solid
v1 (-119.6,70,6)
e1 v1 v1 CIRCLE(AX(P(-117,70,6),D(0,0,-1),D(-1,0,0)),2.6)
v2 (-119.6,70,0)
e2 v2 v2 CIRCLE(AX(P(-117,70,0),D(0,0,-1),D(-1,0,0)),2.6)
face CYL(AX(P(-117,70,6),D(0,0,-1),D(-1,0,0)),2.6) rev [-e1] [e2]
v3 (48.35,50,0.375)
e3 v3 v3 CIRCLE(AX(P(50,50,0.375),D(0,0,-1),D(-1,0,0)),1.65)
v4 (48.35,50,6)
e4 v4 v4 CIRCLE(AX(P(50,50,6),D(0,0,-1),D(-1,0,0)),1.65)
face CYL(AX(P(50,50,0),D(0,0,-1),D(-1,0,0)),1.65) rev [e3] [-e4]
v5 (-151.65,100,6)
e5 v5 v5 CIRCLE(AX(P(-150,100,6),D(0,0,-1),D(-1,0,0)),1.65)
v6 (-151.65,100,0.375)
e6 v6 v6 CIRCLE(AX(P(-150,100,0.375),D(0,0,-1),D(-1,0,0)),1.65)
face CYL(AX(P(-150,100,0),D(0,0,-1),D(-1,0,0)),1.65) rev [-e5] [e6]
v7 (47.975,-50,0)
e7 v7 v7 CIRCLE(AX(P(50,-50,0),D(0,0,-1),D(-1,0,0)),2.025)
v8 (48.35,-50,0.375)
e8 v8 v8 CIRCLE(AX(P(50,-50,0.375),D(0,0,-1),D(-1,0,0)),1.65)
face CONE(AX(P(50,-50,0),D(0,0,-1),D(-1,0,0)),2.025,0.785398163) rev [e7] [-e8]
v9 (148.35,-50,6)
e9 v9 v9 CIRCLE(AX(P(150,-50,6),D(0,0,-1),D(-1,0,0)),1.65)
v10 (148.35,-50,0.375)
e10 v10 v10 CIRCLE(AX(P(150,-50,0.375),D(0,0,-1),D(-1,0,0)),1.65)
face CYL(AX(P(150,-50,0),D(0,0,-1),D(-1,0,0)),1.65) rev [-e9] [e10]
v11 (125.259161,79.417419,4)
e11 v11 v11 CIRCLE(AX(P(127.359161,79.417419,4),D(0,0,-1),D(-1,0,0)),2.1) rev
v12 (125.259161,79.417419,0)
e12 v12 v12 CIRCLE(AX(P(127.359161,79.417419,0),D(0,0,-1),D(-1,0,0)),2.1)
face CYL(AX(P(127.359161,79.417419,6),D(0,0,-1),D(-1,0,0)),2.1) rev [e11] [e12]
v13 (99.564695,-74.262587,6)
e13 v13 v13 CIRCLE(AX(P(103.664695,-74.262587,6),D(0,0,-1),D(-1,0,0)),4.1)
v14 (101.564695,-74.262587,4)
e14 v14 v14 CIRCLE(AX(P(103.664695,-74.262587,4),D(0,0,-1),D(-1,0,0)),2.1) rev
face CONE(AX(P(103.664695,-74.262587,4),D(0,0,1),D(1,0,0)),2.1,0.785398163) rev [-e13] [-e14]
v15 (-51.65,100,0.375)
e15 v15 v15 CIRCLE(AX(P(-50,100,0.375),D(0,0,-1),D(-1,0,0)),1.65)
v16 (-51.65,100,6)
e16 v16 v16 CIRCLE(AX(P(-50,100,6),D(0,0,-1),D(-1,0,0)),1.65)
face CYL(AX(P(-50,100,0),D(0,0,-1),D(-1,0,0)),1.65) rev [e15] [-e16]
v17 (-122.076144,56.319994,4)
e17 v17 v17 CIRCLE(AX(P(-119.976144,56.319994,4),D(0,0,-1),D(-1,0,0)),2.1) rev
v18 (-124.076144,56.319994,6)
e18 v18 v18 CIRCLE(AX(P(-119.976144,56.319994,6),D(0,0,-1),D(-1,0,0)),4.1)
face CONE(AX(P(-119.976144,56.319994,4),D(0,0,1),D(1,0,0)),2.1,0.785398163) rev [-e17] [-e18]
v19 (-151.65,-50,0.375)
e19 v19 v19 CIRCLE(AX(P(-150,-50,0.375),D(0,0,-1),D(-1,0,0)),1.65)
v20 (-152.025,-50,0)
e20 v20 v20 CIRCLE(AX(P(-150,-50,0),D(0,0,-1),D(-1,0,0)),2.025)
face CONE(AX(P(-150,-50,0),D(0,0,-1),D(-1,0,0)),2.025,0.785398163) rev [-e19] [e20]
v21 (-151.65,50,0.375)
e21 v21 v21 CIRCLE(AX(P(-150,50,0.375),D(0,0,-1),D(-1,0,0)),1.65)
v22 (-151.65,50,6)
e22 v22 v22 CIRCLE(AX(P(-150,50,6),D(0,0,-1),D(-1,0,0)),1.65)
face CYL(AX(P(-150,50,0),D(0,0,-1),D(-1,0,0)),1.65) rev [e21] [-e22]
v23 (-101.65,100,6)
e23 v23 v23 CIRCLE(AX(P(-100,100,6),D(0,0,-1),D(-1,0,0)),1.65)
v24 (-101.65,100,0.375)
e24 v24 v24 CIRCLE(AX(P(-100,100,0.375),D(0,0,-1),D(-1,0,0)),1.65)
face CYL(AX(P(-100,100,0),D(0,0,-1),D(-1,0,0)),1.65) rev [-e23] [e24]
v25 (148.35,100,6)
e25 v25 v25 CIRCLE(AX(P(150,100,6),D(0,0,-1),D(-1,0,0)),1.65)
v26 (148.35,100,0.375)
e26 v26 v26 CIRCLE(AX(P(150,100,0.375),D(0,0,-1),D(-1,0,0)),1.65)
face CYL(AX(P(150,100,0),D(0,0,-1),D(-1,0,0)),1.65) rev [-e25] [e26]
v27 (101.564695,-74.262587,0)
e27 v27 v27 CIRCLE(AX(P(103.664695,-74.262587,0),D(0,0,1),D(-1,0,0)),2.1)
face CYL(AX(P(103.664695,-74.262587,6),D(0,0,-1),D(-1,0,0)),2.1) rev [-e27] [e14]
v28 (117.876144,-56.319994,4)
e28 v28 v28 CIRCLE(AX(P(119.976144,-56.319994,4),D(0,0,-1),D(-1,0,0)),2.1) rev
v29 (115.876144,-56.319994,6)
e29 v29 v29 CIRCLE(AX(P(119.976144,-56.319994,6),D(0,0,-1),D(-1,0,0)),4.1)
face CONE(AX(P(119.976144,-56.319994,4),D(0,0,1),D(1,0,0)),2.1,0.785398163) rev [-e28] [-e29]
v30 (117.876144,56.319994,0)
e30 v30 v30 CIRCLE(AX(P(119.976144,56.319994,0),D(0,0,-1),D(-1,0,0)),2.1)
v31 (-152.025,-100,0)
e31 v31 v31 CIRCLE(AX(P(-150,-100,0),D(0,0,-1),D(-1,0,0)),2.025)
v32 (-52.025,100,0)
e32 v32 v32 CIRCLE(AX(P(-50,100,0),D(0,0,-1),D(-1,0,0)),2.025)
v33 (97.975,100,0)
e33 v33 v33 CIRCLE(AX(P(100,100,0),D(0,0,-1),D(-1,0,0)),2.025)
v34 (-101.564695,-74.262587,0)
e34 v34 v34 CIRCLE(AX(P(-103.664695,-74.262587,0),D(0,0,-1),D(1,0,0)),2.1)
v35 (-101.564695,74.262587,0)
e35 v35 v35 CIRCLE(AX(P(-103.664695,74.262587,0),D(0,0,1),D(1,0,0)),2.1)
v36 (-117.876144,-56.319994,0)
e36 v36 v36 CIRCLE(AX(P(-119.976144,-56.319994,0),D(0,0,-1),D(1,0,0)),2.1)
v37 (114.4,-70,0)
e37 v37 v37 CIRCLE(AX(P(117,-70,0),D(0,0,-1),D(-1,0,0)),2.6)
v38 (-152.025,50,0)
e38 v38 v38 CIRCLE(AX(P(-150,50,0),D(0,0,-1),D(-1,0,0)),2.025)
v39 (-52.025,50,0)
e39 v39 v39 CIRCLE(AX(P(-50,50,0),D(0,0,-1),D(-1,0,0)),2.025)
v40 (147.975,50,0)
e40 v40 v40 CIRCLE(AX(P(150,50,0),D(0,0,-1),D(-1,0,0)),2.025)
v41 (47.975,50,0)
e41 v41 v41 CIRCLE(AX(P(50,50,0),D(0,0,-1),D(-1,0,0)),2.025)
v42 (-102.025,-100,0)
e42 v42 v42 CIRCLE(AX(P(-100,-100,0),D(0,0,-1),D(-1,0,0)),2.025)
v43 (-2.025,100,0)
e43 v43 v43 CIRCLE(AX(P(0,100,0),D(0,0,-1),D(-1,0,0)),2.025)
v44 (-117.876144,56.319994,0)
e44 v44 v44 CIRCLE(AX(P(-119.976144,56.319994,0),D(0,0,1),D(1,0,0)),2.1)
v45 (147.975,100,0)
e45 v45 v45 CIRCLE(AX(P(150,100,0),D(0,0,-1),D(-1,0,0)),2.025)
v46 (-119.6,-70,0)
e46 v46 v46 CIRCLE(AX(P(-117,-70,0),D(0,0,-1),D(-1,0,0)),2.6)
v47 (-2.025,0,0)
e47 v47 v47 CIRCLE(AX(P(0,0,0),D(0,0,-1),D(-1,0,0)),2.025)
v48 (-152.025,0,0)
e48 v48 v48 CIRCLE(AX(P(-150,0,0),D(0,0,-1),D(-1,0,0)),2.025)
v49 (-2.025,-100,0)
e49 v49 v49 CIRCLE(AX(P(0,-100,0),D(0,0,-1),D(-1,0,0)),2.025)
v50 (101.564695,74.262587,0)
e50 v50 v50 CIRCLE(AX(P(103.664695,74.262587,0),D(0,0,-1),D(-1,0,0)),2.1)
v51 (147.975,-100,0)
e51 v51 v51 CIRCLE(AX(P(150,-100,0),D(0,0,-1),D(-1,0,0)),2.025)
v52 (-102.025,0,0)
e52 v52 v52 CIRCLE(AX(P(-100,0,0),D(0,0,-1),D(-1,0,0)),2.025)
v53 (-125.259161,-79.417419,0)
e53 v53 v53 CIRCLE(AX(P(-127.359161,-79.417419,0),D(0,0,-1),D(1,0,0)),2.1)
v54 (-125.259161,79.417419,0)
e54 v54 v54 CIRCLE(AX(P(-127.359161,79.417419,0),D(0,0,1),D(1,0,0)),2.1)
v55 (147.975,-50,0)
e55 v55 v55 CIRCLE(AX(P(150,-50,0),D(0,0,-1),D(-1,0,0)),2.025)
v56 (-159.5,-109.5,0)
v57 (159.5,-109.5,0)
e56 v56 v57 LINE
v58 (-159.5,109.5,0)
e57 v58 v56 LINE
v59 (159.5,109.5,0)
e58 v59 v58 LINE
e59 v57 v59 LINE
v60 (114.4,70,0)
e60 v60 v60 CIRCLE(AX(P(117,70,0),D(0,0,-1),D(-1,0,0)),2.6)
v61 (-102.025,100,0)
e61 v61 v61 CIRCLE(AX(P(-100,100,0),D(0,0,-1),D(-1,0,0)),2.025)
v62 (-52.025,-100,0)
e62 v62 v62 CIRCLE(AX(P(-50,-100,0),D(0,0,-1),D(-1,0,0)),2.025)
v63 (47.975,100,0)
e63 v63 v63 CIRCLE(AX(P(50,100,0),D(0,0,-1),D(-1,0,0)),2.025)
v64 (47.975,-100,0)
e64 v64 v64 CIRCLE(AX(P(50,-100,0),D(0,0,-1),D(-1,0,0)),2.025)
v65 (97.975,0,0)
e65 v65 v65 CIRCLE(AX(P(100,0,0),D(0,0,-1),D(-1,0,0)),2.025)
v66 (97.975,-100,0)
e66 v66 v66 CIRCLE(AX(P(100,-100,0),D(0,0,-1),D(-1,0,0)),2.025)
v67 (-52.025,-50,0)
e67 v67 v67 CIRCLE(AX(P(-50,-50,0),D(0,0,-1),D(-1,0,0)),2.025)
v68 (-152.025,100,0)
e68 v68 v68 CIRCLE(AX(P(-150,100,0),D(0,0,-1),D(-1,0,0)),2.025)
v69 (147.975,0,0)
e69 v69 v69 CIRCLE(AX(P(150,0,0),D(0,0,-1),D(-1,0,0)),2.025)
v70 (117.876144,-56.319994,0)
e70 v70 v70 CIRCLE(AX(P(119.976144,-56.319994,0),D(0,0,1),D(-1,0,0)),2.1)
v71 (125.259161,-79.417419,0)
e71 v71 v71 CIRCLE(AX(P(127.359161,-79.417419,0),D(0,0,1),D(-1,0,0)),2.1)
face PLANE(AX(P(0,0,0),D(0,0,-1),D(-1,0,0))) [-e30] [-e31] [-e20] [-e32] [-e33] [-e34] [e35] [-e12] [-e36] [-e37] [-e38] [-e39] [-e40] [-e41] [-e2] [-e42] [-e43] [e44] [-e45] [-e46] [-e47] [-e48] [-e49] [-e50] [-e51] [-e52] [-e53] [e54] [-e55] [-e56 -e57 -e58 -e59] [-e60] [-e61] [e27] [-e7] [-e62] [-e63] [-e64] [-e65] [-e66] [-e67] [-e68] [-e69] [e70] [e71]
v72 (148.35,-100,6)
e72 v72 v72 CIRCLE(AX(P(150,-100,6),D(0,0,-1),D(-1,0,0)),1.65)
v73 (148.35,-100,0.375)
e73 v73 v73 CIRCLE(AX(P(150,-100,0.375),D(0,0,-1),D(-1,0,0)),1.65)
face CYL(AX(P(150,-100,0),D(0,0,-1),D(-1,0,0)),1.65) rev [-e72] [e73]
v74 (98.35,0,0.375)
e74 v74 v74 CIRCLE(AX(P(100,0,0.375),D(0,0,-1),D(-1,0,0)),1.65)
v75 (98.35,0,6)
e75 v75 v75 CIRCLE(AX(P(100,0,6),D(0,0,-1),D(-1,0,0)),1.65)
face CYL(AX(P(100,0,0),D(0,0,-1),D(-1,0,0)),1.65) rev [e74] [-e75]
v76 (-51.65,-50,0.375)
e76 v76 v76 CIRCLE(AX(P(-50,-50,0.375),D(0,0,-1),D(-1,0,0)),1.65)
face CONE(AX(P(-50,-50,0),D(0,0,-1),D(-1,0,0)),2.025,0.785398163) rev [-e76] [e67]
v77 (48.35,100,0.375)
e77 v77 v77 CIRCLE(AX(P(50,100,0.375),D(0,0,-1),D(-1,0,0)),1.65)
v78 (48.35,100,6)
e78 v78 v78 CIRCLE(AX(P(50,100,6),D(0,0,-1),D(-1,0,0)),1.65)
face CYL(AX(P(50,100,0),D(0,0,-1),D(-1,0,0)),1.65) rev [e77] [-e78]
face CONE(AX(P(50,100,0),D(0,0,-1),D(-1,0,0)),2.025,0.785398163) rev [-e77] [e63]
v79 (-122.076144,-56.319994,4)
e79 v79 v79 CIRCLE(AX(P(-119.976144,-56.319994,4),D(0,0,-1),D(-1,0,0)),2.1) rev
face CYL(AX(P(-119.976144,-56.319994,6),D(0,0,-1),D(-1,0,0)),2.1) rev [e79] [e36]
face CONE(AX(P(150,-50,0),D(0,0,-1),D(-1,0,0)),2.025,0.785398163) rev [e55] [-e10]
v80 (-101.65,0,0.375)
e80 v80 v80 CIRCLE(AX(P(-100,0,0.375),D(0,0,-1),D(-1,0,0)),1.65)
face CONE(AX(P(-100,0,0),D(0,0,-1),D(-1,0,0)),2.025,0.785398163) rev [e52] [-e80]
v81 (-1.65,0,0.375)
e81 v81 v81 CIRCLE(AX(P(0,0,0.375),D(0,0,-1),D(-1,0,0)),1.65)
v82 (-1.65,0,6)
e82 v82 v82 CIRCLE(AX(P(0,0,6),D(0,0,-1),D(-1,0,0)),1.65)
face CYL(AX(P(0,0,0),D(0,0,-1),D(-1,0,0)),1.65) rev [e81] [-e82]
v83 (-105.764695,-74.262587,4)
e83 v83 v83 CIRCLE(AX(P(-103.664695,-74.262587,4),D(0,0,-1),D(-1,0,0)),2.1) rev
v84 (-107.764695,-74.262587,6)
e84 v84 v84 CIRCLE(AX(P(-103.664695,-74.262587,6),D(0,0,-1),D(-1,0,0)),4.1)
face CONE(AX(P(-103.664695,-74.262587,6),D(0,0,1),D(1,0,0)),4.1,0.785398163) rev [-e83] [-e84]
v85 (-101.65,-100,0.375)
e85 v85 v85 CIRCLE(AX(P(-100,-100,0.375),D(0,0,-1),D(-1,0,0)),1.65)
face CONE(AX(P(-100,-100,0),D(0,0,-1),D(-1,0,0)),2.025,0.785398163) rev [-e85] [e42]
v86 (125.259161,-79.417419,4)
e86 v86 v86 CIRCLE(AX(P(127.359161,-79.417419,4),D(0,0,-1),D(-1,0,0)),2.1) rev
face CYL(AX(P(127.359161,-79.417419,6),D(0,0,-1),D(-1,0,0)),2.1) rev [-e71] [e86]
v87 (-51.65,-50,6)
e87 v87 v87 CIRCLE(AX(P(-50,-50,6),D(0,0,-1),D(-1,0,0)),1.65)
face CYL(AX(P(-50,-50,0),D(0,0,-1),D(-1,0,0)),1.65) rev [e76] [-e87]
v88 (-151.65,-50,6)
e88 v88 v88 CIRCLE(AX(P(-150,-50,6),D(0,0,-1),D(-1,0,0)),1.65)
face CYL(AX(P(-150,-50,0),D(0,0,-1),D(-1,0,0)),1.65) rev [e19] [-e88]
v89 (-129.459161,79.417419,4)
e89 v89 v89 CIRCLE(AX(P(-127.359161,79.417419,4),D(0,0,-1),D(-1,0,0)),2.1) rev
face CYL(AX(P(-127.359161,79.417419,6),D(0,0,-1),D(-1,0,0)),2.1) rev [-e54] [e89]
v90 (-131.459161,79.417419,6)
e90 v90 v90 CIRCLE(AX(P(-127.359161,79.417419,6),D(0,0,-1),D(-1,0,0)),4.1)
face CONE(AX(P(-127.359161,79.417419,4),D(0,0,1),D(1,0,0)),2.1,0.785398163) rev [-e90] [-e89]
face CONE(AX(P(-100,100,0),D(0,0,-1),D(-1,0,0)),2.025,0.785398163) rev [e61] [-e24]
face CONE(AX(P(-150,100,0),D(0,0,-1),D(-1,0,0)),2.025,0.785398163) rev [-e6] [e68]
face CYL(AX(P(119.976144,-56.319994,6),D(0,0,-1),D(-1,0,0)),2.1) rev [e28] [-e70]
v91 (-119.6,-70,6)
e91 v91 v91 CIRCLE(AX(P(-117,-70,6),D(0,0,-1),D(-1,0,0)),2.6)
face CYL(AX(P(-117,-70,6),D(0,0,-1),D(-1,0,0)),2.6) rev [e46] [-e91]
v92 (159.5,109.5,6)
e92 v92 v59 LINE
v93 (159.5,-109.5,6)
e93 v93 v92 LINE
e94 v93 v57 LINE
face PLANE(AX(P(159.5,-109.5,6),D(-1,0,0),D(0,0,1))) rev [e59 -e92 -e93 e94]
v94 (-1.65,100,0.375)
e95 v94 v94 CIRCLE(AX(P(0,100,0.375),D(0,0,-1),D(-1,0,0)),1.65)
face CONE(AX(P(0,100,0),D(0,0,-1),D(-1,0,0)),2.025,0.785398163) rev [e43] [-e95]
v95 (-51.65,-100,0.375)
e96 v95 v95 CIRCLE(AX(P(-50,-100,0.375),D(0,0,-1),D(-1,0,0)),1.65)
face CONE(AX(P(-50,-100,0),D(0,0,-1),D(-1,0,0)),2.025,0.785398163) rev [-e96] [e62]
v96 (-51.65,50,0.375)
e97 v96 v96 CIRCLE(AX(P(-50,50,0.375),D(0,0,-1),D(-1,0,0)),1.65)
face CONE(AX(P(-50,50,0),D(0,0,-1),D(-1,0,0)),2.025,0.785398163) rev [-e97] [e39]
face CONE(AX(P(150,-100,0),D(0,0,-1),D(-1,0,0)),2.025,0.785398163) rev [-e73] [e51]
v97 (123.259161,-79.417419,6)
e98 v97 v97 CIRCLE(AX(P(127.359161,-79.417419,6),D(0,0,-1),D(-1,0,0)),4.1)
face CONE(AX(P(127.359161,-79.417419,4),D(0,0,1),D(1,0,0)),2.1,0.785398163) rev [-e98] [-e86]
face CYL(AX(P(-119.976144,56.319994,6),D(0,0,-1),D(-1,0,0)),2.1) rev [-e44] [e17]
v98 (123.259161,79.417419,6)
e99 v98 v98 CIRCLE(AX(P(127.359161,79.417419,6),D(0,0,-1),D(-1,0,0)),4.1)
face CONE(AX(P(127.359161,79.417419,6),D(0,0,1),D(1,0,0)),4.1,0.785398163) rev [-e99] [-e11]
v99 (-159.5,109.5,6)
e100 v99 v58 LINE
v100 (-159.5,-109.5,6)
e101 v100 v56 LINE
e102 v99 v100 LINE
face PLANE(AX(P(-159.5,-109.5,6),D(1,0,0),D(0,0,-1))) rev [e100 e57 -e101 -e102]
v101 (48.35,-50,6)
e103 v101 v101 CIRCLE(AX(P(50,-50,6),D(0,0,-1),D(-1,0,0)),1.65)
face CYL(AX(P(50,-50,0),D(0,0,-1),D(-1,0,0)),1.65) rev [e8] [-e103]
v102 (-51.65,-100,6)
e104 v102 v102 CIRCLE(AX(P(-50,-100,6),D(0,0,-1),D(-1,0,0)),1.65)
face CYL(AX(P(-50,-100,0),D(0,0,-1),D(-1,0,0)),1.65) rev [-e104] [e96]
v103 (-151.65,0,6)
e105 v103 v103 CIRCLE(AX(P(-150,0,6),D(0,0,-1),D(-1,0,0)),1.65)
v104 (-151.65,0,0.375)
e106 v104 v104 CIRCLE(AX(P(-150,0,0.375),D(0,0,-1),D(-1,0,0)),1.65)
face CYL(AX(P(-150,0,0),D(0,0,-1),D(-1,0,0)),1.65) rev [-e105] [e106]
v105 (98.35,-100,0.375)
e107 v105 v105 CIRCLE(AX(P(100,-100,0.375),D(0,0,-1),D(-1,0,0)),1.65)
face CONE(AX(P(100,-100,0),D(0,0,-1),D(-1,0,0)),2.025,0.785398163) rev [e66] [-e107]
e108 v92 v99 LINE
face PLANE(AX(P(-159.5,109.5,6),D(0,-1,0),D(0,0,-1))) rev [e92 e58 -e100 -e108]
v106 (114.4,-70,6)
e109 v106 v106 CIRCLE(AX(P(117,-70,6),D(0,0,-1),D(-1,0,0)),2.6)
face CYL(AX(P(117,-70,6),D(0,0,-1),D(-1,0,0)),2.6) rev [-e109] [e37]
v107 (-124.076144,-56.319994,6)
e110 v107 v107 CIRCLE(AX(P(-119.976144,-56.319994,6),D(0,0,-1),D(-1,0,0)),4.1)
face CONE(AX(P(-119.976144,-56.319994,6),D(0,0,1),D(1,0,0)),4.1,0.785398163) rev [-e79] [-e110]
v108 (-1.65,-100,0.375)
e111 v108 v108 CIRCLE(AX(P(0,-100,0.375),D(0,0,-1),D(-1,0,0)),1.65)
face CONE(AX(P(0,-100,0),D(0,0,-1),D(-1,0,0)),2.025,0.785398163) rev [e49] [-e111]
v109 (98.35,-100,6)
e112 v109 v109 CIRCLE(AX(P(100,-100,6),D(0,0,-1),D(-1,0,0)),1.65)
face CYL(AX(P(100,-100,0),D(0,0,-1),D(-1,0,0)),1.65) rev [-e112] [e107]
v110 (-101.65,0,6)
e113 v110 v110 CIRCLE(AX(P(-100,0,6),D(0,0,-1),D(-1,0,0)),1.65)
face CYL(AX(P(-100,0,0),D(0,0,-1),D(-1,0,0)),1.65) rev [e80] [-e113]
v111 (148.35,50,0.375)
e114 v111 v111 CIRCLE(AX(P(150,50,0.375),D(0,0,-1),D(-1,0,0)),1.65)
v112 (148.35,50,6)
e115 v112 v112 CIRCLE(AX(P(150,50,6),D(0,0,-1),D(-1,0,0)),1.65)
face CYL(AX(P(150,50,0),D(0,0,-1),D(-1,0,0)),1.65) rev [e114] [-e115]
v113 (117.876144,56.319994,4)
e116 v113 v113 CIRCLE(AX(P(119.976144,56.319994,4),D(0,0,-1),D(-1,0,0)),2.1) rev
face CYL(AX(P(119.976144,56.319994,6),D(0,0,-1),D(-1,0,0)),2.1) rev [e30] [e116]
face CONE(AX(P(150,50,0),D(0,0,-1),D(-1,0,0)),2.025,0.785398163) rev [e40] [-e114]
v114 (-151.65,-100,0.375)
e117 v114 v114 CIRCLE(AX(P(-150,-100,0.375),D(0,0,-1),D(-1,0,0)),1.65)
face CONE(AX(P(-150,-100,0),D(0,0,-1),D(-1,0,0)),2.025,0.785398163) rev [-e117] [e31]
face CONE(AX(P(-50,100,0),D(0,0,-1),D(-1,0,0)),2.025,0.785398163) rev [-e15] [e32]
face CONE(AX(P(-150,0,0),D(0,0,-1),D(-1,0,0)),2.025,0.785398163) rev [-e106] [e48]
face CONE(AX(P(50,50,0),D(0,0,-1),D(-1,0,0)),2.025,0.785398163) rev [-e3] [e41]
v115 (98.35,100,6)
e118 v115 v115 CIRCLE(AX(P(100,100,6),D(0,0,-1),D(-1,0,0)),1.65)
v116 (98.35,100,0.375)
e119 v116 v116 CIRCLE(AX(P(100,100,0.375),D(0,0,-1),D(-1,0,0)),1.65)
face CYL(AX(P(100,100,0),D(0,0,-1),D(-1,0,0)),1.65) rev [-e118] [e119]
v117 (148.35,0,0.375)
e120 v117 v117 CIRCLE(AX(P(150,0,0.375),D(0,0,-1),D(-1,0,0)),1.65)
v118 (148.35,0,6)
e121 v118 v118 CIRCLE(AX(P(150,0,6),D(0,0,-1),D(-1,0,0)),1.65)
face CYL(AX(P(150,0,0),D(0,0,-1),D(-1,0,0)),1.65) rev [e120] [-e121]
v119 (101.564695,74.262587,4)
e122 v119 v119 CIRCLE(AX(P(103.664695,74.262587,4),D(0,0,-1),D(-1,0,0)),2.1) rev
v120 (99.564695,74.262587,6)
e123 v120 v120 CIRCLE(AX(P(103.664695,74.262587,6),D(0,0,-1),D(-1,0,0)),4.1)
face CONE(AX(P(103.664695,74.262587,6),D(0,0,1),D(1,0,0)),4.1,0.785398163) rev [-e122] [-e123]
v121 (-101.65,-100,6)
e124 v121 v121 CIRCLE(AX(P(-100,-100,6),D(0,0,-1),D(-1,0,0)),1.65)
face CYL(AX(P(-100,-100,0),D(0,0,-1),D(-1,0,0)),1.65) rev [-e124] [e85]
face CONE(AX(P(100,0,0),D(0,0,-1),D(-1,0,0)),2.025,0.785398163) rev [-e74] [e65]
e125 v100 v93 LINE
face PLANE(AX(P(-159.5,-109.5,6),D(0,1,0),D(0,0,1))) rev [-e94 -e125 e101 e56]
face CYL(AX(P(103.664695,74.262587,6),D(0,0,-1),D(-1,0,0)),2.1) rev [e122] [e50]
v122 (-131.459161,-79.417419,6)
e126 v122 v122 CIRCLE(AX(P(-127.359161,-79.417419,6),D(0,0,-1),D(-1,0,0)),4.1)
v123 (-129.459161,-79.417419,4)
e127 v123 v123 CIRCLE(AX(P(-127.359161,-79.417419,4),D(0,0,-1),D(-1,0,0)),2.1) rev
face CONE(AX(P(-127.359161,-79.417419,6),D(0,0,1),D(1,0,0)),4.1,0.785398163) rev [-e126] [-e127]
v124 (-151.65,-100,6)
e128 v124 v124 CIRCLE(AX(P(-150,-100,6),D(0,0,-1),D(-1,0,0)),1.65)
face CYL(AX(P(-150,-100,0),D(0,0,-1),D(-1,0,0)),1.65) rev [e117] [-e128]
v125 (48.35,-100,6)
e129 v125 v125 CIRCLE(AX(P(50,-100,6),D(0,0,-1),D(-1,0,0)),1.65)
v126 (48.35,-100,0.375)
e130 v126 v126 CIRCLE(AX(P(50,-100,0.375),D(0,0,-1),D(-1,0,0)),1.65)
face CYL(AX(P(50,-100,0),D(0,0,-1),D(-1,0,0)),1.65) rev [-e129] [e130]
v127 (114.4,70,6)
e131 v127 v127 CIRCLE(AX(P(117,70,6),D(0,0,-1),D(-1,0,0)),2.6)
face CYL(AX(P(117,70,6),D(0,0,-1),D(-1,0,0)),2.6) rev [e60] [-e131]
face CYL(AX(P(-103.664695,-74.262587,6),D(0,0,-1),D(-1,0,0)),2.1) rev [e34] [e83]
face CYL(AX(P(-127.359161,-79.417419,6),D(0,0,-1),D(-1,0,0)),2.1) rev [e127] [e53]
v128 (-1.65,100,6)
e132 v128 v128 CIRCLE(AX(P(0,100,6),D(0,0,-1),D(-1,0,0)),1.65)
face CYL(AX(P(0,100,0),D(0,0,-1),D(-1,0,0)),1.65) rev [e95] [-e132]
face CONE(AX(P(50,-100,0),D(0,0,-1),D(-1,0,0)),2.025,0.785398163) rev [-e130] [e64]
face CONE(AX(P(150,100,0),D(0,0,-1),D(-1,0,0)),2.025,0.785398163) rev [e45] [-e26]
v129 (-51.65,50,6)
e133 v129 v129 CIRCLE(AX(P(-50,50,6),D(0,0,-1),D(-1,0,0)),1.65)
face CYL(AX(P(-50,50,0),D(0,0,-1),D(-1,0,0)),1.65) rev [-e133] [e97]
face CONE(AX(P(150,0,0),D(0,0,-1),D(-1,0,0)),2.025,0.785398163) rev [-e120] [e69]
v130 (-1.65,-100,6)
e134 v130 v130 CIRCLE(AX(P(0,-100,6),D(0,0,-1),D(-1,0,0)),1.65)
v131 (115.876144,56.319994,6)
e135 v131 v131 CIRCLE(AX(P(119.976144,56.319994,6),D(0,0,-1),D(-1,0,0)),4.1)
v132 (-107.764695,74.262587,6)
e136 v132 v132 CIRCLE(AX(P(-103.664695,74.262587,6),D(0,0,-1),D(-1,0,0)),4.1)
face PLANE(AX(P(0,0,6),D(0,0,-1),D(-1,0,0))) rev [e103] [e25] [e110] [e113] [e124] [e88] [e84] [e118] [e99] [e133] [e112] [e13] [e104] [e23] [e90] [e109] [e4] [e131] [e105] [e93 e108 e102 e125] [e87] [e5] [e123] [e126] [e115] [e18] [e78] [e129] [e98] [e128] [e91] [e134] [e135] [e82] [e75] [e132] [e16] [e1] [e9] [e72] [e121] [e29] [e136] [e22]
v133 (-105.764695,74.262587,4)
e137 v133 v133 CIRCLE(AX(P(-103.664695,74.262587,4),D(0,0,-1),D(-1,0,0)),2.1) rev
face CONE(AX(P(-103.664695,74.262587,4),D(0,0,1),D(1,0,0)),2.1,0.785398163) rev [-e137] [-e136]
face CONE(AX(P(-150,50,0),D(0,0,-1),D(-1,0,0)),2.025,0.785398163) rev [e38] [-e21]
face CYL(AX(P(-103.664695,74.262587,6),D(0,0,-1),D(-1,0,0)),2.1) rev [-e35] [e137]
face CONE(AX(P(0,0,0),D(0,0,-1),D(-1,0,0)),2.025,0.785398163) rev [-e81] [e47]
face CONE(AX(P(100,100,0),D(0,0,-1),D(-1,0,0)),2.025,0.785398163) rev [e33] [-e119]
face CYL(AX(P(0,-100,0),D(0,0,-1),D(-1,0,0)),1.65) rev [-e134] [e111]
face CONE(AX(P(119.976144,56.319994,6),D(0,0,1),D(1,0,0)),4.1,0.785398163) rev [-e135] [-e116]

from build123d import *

# Parameters (mm, degrees)
SKETCH_1_W                  = 319
SKETCH_1_H                  = 219
EXTRUDE_1_DEPTH             = 6
HOLE_WIZARD_M41_D           = 3.3
HOLE_WIZARD_M41_CSINK_D     = 4.05
HOLE_WIZARD_M41_CSINK_ANGLE = 90
PATTERN_LINEAR_3_COUNT      = 7
PATTERN_LINEAR_3_PITCH      = 50
PATTERN_LINEAR_3_COUNT_DIR2 = 5
PATTERN_LINEAR_3_PITCH_DIR2 = 50
SKETCH_8_R                  = 2.6
CUT_EXTRUDE_2_DEPTH         = 194.562651356
SKETCH_9_R                  = 2.1
CUT_EXTRUDE_3_DEPTH         = 194.562651356
CHAMFER_1_SIZE              = 2
CHAMFER_1_OF_MIRROR_1_SIZE  = 2


# Read off the part's stored shape, not the designer's step: Зеркальное отражение2
with BuildPart() as part:
    # Эскиз1 → Бобышка-Вытянуть1 (new body)
    with BuildSketch(Plane.XY):
        Rectangle(SKETCH_1_W, SKETCH_1_H)
    extrude(amount=EXTRUDE_1_DEPTH)

    # Отверстие обработанное метчиком M41 (through all)
    with Locations(Plane(origin=(0, 0, 0), x_dir=(-1, 0, 0), z_dir=(0, 0, -1))):
        with Locations((-150, -100)):
            hole_wizard_m41 = CounterSinkHole(HOLE_WIZARD_M41_D / 2, HOLE_WIZARD_M41_CSINK_D / 2, counter_sink_angle=HOLE_WIZARD_M41_CSINK_ANGLE)

    # Линейный массив3: Hole Wizard M41 7 × 5, 8 skipped
    with Locations(*[(-i * PATTERN_LINEAR_3_PITCH, j * PATTERN_LINEAR_3_PITCH_DIR2, 0) for i in range(PATTERN_LINEAR_3_COUNT) for j in range(PATTERN_LINEAR_3_COUNT_DIR2) if (i, j) not in ((0, 0), (1, 1), (1, 3), (2, 2), (3, 1), (3, 3), (4, 2), (5, 1), (5, 3))]):
        add(hole_wizard_m41, mode=Mode.SUBTRACT)

    # Эскиз8 → Вырез-Вытянуть2 (cut, through all)
    with BuildSketch(Plane(origin=(0, 0, 0), x_dir=(-1, 0, 0), z_dir=(0, 0, -1))):
        with Locations((-117, 70)):
            Circle(SKETCH_8_R)
        with Locations((117, 70)):
            Circle(SKETCH_8_R)
        with Locations((117, -70)):
            Circle(SKETCH_8_R)
        with Locations((-117, -70)):
            Circle(SKETCH_8_R)
    extrude(amount=-CUT_EXTRUDE_2_DEPTH, mode=Mode.SUBTRACT)

    # Эскиз9 → Вырез-Вытянуть3 (cut, through all)
    with BuildSketch(Plane(origin=(0, 0, 0), x_dir=(-1, 0, 0), z_dir=(0, 0, -1))):
        with Locations((-127.359161028, 79.417419116)):
            Circle(SKETCH_9_R)
        with Locations((-103.664695294, 74.262587054)):
            Circle(SKETCH_9_R)
        with Locations((-119.976143679, 56.31999383)):
            Circle(SKETCH_9_R)
    cut_extrude_3 = extrude(amount=-CUT_EXTRUDE_3_DEPTH, mode=Mode.SUBTRACT)

    # Фаска1
    chamfer_1_edges = [part.edges().sort_by_distance(p)[0] for p in [
        (129.459161028, 79.417419116, 6),
        (105.764695294, 74.262587054, 6),
        (122.076143679, 56.31999383, 6),
    ]]
    chamfer(chamfer_1_edges, length=CHAMFER_1_SIZE)

    # Зеркальное отражение1: Вырез-Вытянуть3 across plane
    add(cut_extrude_3.mirror(Plane(origin=(0, 0, 0), x_dir=(0, 0, 1), z_dir=(1, 0, 0))), mode=Mode.SUBTRACT)

    # Фаска1 of Зеркальное отражение1
    chamfer_1_of_mirror_1_edges = [part.edges().sort_by_distance(p)[0] for p in [
        (-129.459161028, 79.417419116, 6),
        (-105.764695294, 74.262587054, 6),
        (-122.076143679, 56.31999383, 6),
    ]]
    chamfer(chamfer_1_of_mirror_1_edges, length=CHAMFER_1_OF_MIRROR_1_SIZE)

    # Зеркальное отражение2 outline → Зеркальное отражение2 (revolve, cut)
    with BuildSketch(Plane(origin=(127.359161028, -79.417419116, 0), x_dir=(1, 0, 0), z_dir=(0, -1, 0))):
        Polygon((4.1, 6), (0, 6), (0, 0), (2.1, 0), (2.1, 4), align=None)
    revolve(axis=Axis((127.359161028, -79.417419116, 0), (0, 0, 1)), mode=Mode.SUBTRACT)

    # Mirror 2 2 outline → Mirror 2 2 (revolve, cut)
    with BuildSketch(Plane(origin=(103.664695294, -74.262587054, 0), x_dir=(1, 0, 0), z_dir=(0, -1, 0))):
        Polygon((4.1, 6), (0, 6), (0, 0), (2.1, 0), (2.1, 4), align=None)
    revolve(axis=Axis((103.664695294, -74.262587054, 0), (0, 0, 1)), mode=Mode.SUBTRACT)

    # Mirror 2 3 outline → Mirror 2 3 (revolve, cut)
    with BuildSketch(Plane(origin=(119.976143679, -56.31999383, 0), x_dir=(1, 0, 0), z_dir=(0, -1, 0))):
        Polygon((4.1, 6), (0, 6), (0, 0), (2.1, 0), (2.1, 4), align=None)
    revolve(axis=Axis((119.976143679, -56.31999383, 0), (0, 0, 1)), mode=Mode.SUBTRACT)

    # Mirror 2 4 outline → Mirror 2 4 (revolve, cut)
    with BuildSketch(Plane(origin=(-127.359161028, -79.417419116, 0), x_dir=(1, 0, 0), z_dir=(0, -1, 0))):
        Polygon((4.1, 6), (0, 6), (0, 0), (2.1, 0), (2.1, 4), align=None)
    revolve(axis=Axis((-127.359161028, -79.417419116, 0), (0, 0, 1)), mode=Mode.SUBTRACT)

    # Mirror 2 5 outline → Mirror 2 5 (revolve, cut)
    with BuildSketch(Plane(origin=(-103.664695294, -74.262587054, 0), x_dir=(1, 0, 0), z_dir=(0, -1, 0))):
        Polygon((4.1, 6), (0, 6), (0, 0), (2.1, 0), (2.1, 4), align=None)
    revolve(axis=Axis((-103.664695294, -74.262587054, 0), (0, 0, 1)), mode=Mode.SUBTRACT)

    # Mirror 2 6 outline → Mirror 2 6 (revolve, cut)
    with BuildSketch(Plane(origin=(-119.976143679, -56.31999383, 0), x_dir=(1, 0, 0), z_dir=(0, -1, 0))):
        Polygon((4.1, 6), (0, 6), (0, 0), (2.1, 0), (2.1, 4), align=None)
    revolve(axis=Axis((-119.976143679, -56.31999383, 0), (0, 0, 1)), mode=Mode.SUBTRACT)


solid = part.part
